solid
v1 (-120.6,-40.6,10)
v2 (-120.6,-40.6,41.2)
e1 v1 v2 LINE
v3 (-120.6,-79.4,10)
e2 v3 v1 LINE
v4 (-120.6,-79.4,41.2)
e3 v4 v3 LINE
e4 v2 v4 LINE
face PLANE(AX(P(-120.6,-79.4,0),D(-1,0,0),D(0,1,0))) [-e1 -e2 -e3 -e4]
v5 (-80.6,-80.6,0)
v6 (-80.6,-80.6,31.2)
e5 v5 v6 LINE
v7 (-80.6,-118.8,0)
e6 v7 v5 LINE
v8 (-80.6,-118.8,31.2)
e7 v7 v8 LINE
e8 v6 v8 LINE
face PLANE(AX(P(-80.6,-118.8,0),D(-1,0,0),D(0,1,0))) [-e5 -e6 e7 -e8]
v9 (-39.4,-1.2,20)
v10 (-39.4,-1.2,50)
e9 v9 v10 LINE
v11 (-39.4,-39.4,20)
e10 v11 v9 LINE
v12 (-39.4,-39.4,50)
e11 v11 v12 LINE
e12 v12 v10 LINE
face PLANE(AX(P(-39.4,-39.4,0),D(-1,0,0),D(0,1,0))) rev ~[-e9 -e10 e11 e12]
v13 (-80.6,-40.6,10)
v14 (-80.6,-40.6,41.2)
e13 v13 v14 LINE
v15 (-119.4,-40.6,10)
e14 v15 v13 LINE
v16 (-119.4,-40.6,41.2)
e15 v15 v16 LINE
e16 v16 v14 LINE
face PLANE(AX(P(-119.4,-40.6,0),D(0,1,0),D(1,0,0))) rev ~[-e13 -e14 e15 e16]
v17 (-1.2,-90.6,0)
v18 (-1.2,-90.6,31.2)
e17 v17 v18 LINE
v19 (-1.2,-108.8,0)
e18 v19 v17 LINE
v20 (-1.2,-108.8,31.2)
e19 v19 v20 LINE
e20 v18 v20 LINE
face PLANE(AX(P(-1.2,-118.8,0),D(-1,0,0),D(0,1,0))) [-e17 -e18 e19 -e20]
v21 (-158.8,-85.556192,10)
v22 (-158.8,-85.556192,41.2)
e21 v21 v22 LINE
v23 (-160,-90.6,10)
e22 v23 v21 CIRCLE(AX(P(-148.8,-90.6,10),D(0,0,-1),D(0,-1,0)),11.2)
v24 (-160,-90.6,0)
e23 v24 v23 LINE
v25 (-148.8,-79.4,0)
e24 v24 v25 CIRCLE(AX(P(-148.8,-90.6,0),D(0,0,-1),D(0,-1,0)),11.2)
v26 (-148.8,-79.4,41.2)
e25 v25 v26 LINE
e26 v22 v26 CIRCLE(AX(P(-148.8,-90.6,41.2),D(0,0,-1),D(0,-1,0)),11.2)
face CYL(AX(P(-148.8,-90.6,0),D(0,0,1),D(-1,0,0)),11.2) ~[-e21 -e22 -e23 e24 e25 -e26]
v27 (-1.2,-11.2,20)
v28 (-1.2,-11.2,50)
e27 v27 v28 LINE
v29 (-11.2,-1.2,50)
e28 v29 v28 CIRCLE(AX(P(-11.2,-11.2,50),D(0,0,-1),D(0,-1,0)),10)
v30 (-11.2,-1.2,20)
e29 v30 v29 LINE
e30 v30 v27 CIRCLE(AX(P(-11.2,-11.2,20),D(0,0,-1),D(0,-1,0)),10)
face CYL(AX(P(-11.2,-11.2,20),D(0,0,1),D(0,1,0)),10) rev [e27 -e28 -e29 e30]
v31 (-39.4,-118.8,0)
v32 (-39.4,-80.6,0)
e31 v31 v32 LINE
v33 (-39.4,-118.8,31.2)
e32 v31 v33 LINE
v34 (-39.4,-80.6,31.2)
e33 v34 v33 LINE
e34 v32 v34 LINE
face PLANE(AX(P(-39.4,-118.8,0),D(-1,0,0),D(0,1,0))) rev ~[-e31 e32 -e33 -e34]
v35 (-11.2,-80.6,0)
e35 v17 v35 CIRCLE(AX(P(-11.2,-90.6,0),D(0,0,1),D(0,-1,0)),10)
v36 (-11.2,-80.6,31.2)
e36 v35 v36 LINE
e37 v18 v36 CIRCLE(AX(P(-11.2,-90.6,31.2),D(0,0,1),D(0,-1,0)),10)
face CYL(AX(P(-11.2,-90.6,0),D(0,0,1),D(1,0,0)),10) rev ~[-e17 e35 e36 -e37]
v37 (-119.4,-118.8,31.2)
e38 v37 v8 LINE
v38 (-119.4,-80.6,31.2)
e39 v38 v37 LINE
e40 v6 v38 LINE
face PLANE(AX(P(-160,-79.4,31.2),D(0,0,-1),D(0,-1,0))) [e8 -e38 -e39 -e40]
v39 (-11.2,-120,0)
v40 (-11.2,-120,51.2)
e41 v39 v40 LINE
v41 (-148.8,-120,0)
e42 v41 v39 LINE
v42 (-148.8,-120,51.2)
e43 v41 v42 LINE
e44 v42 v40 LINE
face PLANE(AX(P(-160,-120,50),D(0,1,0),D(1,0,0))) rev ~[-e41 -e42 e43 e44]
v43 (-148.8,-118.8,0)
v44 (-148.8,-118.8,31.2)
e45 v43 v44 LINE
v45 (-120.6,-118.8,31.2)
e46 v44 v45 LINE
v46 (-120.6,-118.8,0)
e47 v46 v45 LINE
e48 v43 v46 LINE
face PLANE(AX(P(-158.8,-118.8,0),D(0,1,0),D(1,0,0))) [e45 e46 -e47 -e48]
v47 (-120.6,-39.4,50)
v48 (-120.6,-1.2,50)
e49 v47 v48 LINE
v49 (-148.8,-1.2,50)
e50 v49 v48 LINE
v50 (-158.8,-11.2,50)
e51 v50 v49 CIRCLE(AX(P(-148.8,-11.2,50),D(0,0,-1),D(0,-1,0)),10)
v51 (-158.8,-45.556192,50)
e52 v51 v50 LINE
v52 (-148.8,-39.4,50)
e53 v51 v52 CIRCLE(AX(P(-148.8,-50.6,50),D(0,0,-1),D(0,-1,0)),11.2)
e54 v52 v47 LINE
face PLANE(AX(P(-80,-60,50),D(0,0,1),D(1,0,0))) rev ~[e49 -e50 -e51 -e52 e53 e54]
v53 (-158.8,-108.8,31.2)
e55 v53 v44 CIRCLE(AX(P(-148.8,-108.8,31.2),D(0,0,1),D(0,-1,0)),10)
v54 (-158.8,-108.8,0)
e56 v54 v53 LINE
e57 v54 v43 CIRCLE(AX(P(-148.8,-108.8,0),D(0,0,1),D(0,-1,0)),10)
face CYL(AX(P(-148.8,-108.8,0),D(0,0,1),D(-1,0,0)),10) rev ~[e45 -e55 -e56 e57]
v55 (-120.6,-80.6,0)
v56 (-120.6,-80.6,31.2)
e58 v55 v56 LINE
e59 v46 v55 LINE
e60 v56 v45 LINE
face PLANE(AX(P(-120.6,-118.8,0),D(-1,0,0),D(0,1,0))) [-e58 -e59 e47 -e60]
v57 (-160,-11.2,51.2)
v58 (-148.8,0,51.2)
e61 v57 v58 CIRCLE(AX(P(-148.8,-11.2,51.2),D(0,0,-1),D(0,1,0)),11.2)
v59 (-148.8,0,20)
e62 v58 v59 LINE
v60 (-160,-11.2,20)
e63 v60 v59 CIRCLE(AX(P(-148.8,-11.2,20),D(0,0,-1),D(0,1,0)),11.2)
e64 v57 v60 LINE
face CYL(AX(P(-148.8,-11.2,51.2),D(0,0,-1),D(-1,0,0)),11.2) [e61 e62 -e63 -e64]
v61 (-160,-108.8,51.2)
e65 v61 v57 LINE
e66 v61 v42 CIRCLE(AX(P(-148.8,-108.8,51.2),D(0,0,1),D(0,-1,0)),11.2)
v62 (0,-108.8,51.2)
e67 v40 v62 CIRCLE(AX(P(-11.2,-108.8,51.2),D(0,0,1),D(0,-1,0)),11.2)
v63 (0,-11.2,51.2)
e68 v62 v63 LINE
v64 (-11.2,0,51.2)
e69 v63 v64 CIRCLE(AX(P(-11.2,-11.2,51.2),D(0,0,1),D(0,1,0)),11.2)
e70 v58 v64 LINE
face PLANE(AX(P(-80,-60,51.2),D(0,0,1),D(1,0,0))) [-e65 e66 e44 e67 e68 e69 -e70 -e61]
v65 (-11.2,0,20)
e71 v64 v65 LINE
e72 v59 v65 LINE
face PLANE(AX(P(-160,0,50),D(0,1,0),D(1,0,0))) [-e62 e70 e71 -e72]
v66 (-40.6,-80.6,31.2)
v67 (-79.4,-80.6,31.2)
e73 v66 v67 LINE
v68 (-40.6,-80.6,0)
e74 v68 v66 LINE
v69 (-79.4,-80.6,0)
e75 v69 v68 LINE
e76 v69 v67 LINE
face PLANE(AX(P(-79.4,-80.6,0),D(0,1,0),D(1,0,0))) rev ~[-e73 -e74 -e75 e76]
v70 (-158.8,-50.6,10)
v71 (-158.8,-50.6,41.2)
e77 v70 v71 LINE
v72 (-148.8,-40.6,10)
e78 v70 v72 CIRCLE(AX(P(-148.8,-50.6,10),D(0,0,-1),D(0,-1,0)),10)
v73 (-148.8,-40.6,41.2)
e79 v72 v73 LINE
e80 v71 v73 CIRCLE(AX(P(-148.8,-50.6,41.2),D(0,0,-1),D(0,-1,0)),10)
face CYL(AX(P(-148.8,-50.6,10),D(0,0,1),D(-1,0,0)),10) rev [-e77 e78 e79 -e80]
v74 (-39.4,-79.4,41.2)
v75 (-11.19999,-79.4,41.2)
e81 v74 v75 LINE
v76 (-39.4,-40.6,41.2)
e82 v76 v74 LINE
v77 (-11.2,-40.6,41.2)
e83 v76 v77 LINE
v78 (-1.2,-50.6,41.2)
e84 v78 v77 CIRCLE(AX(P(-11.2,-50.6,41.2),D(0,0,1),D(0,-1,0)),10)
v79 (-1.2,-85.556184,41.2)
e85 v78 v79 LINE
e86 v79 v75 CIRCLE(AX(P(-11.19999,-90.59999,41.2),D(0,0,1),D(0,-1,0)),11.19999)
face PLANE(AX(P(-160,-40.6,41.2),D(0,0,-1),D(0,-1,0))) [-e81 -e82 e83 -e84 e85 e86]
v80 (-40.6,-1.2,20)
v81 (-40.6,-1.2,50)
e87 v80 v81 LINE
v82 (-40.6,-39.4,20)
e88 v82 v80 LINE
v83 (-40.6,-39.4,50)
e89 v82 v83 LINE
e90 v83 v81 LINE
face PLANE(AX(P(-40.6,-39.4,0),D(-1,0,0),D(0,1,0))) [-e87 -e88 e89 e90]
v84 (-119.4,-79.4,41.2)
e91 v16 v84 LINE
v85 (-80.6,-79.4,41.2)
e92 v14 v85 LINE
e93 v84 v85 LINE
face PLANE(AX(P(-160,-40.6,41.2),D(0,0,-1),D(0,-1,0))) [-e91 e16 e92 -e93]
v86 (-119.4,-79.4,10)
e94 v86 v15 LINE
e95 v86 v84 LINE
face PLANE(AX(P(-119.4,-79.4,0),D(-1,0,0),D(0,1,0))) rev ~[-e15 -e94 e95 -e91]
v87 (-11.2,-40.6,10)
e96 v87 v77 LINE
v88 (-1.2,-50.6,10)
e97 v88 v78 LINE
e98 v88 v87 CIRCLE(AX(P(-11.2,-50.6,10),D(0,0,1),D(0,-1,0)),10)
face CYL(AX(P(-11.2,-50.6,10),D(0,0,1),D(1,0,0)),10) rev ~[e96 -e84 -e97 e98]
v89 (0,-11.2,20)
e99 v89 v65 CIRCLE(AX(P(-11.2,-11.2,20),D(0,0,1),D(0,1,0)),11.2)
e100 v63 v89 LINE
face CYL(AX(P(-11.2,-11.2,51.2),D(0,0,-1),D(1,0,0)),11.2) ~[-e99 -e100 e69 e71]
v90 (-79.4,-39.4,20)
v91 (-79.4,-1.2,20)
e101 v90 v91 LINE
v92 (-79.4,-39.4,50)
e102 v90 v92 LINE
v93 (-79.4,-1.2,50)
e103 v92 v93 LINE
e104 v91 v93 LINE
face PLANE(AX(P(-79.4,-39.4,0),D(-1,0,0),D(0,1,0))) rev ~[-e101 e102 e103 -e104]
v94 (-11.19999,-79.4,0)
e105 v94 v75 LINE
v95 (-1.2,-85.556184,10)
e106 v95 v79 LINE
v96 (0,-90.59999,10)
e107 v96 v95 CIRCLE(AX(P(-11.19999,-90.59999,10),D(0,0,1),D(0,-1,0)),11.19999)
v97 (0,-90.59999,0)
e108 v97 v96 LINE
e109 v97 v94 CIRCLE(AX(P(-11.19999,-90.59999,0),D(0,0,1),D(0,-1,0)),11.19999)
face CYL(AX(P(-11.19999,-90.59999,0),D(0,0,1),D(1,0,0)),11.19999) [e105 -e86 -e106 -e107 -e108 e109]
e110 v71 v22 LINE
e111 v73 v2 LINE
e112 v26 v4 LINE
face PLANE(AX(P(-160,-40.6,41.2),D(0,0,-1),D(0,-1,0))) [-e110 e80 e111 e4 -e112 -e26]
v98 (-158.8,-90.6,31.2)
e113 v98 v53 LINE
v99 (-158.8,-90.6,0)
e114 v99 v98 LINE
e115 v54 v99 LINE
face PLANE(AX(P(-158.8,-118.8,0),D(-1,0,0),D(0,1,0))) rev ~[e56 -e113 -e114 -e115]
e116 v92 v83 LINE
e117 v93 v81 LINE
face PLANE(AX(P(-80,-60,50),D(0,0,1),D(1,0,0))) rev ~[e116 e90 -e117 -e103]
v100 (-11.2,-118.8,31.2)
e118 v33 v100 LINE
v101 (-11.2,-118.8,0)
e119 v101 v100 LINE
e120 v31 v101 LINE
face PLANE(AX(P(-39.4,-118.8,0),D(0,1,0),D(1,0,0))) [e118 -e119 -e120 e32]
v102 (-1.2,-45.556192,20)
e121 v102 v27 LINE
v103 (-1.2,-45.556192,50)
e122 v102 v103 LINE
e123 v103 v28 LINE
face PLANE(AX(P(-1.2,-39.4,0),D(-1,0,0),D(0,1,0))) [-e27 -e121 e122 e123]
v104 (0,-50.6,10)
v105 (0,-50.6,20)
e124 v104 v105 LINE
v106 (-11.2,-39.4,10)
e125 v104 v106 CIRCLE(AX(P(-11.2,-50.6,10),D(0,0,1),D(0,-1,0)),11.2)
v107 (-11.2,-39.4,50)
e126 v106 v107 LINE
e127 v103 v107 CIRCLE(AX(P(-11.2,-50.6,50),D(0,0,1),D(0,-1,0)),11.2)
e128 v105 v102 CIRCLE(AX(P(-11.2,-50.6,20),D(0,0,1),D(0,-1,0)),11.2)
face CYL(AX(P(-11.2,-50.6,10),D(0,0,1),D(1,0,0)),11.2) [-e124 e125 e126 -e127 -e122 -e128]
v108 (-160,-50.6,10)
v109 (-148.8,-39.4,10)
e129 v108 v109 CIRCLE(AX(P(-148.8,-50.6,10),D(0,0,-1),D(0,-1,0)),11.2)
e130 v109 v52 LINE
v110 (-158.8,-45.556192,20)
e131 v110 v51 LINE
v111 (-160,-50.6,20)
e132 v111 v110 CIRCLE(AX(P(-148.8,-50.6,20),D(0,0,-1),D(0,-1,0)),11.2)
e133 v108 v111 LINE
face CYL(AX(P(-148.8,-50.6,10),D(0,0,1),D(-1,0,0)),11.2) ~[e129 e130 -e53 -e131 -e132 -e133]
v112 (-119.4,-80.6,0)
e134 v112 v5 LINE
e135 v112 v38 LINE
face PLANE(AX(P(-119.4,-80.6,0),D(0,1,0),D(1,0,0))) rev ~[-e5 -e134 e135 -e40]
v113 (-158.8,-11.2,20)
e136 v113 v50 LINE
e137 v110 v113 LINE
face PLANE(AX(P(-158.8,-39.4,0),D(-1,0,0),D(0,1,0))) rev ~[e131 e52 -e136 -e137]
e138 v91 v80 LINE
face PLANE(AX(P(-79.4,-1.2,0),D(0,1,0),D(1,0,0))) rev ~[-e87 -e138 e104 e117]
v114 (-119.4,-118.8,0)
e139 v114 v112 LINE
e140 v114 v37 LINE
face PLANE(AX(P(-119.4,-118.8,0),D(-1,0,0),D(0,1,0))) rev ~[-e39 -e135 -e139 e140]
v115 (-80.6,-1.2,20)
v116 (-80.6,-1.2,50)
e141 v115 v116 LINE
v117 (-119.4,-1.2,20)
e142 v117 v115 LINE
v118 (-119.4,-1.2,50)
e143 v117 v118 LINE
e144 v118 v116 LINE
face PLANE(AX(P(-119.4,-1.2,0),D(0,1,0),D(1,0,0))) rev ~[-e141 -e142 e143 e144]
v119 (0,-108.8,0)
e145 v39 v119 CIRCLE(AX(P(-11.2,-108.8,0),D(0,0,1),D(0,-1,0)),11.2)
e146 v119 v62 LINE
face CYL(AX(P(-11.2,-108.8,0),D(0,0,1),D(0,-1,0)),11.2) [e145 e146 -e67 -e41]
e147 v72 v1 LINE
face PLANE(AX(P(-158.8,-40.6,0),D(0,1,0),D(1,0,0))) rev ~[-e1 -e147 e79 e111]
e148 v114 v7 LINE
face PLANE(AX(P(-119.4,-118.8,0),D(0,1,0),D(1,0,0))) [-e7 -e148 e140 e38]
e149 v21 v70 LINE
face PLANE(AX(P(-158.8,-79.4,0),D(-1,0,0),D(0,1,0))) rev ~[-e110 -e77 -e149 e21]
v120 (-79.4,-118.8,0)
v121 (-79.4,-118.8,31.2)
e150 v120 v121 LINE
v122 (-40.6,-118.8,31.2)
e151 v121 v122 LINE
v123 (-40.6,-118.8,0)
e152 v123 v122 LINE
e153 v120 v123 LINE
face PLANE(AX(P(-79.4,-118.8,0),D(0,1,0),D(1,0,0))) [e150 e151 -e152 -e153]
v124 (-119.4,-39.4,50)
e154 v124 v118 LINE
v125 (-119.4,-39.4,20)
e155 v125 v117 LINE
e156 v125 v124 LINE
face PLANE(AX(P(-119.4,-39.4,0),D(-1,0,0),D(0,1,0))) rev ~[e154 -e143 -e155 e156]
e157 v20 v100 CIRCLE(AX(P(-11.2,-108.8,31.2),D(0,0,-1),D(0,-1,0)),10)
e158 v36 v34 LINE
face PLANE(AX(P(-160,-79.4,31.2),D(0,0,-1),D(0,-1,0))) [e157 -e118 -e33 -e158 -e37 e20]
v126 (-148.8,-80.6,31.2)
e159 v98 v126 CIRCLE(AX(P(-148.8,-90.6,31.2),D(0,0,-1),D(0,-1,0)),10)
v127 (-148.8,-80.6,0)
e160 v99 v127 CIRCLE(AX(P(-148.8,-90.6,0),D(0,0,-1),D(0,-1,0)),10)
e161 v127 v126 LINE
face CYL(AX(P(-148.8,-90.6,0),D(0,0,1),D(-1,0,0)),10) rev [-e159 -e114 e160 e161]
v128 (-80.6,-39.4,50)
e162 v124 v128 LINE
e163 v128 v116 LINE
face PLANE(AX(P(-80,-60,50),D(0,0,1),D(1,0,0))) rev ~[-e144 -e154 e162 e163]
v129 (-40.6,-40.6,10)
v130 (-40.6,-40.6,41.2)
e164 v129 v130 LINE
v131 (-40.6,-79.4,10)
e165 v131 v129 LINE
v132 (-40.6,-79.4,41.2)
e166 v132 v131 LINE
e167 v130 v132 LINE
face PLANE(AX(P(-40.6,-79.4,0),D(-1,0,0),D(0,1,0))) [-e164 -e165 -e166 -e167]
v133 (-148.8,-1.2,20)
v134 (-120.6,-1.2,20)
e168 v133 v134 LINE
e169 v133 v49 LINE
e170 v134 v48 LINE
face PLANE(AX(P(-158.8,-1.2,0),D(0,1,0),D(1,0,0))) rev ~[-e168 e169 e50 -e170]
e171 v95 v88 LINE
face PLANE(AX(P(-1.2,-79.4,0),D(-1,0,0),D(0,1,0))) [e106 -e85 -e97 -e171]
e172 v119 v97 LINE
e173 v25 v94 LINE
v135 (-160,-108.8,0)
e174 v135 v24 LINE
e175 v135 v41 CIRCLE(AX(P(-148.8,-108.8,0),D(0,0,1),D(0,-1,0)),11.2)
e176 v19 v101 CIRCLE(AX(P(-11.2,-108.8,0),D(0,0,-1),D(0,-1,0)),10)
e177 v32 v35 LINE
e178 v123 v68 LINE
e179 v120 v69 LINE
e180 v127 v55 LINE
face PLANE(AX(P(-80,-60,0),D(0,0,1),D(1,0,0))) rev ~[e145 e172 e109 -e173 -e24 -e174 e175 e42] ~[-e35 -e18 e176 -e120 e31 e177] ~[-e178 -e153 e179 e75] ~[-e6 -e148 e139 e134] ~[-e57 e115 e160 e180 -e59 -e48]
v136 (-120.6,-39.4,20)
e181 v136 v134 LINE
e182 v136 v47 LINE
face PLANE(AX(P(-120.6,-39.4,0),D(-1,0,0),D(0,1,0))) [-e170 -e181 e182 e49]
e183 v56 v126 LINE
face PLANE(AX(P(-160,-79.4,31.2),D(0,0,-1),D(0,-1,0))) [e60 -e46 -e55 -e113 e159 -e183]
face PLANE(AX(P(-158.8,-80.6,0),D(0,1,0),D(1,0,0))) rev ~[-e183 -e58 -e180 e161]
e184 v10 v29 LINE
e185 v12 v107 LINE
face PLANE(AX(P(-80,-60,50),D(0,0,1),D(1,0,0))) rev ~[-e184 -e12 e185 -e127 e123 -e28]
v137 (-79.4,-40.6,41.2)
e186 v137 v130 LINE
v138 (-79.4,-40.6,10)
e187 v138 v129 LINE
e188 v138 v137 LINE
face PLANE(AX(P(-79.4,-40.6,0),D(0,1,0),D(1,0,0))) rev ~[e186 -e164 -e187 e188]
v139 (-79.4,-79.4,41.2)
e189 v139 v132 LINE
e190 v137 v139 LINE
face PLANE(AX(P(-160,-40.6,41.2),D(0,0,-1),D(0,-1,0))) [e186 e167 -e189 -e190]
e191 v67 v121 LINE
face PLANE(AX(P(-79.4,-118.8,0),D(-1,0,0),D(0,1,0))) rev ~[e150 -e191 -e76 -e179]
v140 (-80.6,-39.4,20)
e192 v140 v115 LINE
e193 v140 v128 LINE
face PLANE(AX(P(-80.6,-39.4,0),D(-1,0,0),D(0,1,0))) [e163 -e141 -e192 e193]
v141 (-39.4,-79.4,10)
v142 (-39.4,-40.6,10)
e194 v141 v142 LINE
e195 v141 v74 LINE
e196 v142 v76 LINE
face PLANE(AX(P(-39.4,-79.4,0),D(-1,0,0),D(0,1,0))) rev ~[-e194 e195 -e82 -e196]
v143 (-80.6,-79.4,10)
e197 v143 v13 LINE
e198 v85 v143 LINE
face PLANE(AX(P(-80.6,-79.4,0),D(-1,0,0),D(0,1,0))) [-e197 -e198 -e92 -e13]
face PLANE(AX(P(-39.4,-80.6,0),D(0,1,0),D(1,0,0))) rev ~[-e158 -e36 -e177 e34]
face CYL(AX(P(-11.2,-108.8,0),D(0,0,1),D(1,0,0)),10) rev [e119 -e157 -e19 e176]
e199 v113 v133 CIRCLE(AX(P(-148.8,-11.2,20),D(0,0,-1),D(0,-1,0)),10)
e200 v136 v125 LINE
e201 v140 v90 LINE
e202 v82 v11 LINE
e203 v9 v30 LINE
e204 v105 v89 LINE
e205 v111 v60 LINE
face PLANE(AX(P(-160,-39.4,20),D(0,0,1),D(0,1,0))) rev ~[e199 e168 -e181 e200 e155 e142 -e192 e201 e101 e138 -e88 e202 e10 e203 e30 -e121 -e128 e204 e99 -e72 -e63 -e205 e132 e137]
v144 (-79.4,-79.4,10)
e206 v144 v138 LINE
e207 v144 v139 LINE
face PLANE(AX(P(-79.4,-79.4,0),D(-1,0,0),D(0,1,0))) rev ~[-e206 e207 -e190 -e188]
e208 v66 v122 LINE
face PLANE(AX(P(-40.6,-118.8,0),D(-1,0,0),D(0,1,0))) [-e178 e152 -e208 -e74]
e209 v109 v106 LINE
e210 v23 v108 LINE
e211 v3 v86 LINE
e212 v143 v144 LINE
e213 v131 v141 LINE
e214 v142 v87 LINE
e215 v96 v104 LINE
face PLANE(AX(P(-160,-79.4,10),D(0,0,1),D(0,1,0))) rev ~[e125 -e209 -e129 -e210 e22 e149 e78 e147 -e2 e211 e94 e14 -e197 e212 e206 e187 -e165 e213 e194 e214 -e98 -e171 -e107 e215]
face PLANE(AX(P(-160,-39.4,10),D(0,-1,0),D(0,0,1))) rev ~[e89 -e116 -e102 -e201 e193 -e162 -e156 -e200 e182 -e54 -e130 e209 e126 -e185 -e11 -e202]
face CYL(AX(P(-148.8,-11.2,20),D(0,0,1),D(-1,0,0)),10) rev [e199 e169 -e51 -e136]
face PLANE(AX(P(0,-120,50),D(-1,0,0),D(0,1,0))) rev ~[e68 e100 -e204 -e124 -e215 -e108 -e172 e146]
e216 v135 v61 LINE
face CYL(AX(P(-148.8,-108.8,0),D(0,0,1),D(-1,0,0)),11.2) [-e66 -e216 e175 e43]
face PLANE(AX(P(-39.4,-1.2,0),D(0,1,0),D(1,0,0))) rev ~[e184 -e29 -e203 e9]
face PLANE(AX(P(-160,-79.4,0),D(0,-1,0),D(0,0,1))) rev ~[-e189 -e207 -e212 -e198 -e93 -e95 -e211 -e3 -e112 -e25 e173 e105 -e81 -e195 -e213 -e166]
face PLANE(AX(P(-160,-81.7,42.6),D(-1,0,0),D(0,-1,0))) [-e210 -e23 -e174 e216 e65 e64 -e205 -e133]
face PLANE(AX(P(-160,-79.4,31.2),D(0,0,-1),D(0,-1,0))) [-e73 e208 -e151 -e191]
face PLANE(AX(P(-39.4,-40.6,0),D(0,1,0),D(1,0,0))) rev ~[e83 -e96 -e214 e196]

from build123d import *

# Parameters (mm, degrees)
F0_W     = 160
F0_H     = 120
F0_W_2   = 38.2
F0_H_2   = 38.2
F0_W_3   = 38.8
F0_H_3   = 38.8
F1_DEPTH = 50
F2_W     = 160
F2_H     = 120
F3_DEPTH = 1.2
F5_DEPTH = 160.001
F7_DEPTH = 158.8
F8_R     = 10
F9_R     = 11.2
F10_R    = 10
F11_R    = 11.2
F11_R_2  = 11.19999


# Not quite as in the source:
# - a fillet or chamfer is up to 0.001 mm smaller than in the source, because OpenCascade refuses the exact size


with BuildPart() as f1:
    # F0 (on Top) → F1 (new body)
    with BuildSketch(Plane.XY):
        with Locations((-80, -60)):
            Rectangle(F0_W, F0_H)
        with Locations((-139.7, -99.7)):
            Rectangle(F0_W_2, F0_H_2, mode=Mode.SUBTRACT)
        with Locations((-100, -99.7)):
            Rectangle(F0_W_3, F0_H_2, mode=Mode.SUBTRACT)
        with Locations((-60, -99.7)):
            Rectangle(F0_W_3, F0_H_2, mode=Mode.SUBTRACT)
        with Locations((-20.3, -99.7)):
            Rectangle(F0_W_2, F0_H_2, mode=Mode.SUBTRACT)
        with Locations((-139.7, -60)):
            Rectangle(F0_W_2, F0_H_3, mode=Mode.SUBTRACT)
        with Locations((-100, -60)):
            Rectangle(F0_W_3, F0_H_3, mode=Mode.SUBTRACT)
        with Locations((-139.7, -20.3)):
            Rectangle(F0_W_2, F0_H_2, mode=Mode.SUBTRACT)
        with Locations((-100, -20.3)):
            Rectangle(F0_W_3, F0_H_2, mode=Mode.SUBTRACT)
        with Locations((-60, -60)):
            Rectangle(F0_W_3, F0_H_3, mode=Mode.SUBTRACT)
        with Locations((-20.3, -60)):
            Rectangle(F0_W_2, F0_H_3, mode=Mode.SUBTRACT)
        with Locations((-60, -20.3)):
            Rectangle(F0_W_3, F0_H_2, mode=Mode.SUBTRACT)
        with Locations((-20.3, -20.3)):
            Rectangle(F0_W_2, F0_H_2, mode=Mode.SUBTRACT)
    extrude(amount=F1_DEPTH)

    # F2 (on face) → F3 (join)
    with BuildSketch(Plane.XY.offset(50)):
        with Locations((-80, -60)):
            Rectangle(F2_W, F2_H)
    extrude(amount=F3_DEPTH)

    # F4 (on face) → F5 (cut, through all)
    with BuildSketch(Plane(origin=(-160, 0, 0), x_dir=(0, -1, 0), z_dir=(-1, 0, 0))):
        Polygon((79.4, 0), (79.4, 10), (39.4, 10), (39.4, 20), (0, 20), (0, 0), align=None)
    extrude(amount=-F5_DEPTH, mode=Mode.SUBTRACT)

    # F6 (on face) → F7 (join, through all)
    with BuildSketch(Plane(origin=(-160, 0, 0), x_dir=(0, -1, 0), z_dir=(-1, 0, 0))):
        Polygon((40.6, 50), (40.6, 41.2), (79.4, 41.2), (79.4, 31.2), (118.8, 31.2), (118.8, 50), align=None)
    extrude(amount=-F7_DEPTH)

    # F8
    f8_edges = [f1.edges().sort_by_distance(p)[0] for p in [
        (-1.2, -118.8, 15.6),
        (-1.2, -1.2, 35),
        (-158.8, -118.8, 15.6),
        (-158.8, -1.2, 35),
    ]]
    fillet(f8_edges, radius=F8_R)

    # F9
    f9_edges = [f1.edges().sort_by_distance(p)[0] for p in [
        (-160, 0, 35.6),
        (0, 0, 35.6),
        (0, -120, 25.6),
        (-160, -120, 25.6),
    ]]
    fillet(f9_edges, radius=F9_R)

    # F10
    f10_edges = [f1.edges().sort_by_distance(p)[0] for p in [
        (-158.8, -80.6, 15.6),
        (-158.8, -40.6, 25.6),
        (-1.2, -40.6, 25.6),
        (-1.2, -80.6, 15.6),
    ]]
    fillet(f10_edges, radius=F10_R)

    # F11 (call 1 of 4: OpenCascade refuses the feature's edges together)
    f11_edges = [f1.edges().sort_by_distance(p)[0] for p in [
        (-160, -79.4, 5),
    ]]
    fillet(f11_edges, radius=F11_R)

    # F11#2 (call 2 of 4)
    f11_2_edges = [f1.edges().sort_by_distance(p)[0] for p in [
        (-160, -39.4, 15),
    ]]
    fillet(f11_2_edges, radius=F11_R)

    # F11#3 (call 3 of 4) (radius 11.2 in the source; OpenCascade refuses exactly that, so slightly less here)
    f11_3_edges = [f1.edges().sort_by_distance(p)[0] for p in [
        (0, -79.4, 5),
    ]]
    fillet(f11_3_edges, radius=F11_R_2)

    # F11#4 (call 4 of 4)
    f11_4_edges = [f1.edges().sort_by_distance(p)[0] for p in [
        (0, -39.4, 15),
    ]]
    fillet(f11_4_edges, radius=F11_R)


solid = f1.part
